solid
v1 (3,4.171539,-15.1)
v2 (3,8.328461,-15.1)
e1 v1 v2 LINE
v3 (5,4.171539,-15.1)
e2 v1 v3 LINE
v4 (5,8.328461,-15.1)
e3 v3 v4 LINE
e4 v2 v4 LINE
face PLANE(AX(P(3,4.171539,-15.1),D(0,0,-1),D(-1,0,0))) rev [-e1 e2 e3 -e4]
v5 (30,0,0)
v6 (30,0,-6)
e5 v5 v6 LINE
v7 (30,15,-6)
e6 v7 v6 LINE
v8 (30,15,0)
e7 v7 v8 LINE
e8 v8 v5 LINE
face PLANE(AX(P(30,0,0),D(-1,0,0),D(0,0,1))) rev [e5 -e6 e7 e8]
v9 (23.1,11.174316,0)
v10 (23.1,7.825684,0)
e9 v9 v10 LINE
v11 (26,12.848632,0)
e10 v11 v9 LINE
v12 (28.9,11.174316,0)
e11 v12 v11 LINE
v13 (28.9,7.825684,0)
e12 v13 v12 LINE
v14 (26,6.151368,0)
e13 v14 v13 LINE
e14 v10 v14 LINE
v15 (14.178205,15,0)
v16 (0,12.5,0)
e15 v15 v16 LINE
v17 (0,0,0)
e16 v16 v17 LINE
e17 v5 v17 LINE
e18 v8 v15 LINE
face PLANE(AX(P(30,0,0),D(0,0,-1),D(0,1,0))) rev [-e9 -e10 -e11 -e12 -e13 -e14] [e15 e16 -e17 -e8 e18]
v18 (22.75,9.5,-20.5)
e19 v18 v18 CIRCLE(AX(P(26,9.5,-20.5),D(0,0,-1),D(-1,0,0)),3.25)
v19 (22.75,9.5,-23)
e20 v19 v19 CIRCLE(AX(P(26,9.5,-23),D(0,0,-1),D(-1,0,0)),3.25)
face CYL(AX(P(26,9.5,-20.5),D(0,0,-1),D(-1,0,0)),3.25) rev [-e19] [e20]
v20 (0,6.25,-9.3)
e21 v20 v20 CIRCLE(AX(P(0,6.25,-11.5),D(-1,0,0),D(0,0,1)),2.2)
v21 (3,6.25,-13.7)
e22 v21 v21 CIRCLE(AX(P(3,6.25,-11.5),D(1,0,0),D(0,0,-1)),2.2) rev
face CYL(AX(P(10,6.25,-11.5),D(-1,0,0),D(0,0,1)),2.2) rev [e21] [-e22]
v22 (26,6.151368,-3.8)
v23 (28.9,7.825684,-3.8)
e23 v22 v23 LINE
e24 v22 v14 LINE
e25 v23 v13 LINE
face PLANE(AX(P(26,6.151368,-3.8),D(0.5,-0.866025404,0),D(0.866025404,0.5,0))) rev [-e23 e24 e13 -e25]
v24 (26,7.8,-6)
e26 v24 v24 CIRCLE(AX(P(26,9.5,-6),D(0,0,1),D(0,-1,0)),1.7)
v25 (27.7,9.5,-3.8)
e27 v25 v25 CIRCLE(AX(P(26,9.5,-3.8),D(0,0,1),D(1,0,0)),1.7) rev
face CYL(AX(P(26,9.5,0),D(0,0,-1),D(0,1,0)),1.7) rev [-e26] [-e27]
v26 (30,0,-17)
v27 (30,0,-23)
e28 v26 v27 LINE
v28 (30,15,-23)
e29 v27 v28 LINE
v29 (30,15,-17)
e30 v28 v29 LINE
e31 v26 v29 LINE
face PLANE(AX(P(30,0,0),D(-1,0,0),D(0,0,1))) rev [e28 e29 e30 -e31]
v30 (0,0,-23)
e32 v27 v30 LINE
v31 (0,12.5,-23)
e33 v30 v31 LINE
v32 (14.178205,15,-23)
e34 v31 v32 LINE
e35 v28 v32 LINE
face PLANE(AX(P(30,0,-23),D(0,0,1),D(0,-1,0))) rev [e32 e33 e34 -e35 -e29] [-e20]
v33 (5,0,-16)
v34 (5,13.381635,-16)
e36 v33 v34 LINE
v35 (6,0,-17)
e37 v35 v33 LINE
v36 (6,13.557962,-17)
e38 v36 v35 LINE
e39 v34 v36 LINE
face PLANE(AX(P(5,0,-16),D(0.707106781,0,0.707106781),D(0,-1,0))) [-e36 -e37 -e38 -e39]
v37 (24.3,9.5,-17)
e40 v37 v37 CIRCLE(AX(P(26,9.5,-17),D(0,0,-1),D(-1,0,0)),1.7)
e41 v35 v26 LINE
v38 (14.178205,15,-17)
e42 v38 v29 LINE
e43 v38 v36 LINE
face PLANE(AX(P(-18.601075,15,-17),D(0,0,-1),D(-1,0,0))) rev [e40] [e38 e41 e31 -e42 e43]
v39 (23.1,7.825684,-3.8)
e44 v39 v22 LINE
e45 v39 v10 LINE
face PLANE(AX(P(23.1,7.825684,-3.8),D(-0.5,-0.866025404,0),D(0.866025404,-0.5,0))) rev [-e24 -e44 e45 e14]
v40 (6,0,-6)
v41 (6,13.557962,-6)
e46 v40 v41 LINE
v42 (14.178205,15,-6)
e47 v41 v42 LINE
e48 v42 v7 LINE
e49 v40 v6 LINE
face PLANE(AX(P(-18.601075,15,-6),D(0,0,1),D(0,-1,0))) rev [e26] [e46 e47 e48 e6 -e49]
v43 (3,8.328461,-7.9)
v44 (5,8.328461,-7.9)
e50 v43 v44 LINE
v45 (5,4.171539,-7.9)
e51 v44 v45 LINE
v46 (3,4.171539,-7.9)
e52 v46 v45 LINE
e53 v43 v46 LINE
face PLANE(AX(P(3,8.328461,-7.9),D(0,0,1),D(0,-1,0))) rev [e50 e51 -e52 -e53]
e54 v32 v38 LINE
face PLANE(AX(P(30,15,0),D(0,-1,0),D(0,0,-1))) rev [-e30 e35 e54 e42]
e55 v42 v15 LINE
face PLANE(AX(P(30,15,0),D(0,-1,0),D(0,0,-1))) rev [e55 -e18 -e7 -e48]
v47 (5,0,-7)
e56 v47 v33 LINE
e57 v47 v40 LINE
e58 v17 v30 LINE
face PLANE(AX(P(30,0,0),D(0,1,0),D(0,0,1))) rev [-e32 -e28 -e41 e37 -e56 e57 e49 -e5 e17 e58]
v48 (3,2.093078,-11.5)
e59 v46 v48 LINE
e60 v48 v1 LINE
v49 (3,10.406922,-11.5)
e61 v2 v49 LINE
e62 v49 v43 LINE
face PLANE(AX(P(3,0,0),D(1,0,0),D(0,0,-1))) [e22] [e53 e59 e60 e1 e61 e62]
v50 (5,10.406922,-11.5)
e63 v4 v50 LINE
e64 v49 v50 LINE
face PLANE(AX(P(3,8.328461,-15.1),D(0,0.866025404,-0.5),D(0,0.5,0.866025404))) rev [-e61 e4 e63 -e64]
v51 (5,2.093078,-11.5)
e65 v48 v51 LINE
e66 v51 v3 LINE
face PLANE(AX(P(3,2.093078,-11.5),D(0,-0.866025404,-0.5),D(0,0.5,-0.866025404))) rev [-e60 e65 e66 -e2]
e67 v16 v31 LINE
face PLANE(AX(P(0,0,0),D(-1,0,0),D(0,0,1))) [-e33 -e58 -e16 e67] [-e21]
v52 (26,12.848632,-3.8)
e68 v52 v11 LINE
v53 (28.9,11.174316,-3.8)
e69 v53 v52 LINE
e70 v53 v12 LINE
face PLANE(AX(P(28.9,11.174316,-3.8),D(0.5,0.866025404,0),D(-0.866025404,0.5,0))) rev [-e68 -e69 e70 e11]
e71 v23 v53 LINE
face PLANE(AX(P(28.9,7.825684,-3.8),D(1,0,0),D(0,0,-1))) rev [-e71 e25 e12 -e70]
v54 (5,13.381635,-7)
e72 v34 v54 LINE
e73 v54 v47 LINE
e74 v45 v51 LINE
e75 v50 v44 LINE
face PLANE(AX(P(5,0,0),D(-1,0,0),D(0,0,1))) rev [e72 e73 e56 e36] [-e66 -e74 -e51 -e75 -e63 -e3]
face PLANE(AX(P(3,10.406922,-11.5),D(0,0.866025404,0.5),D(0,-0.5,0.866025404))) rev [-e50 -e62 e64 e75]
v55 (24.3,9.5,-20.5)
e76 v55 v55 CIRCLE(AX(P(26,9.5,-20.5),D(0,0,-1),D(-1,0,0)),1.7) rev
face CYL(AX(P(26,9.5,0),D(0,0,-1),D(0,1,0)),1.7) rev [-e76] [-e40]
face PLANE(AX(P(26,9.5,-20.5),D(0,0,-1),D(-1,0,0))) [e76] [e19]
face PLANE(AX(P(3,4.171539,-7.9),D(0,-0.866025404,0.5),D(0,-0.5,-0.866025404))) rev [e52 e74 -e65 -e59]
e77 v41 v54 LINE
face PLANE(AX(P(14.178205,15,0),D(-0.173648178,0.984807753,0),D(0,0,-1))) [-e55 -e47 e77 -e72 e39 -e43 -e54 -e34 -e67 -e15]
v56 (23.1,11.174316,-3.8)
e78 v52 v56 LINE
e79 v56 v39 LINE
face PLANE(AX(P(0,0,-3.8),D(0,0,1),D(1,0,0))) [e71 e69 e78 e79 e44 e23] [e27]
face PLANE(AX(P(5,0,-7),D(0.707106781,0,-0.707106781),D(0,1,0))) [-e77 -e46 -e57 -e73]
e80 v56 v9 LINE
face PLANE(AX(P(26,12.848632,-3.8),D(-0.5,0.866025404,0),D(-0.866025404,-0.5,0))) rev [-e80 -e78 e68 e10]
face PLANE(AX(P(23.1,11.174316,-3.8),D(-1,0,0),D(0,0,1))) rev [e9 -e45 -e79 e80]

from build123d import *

# Parameters (mm, degrees)
SKETCH1_W               = 23
SKETCH1_H               = 15
BOSS_EXTRUDE1_DEPTH     = 30
SKETCH2_W               = 11
SKETCH2_H               = 15
CUT_EXTRUDE1_DEPTH      = 25
CUT_EXTRUDE2_DEPTH      = 41.669398815
CUT_EXTRUDE2_DEPTH_BACK = 41.669398815
SKETCH3_R               = 1.7
CHAMFER1_SIZE           = 2.5
CHAMFER1_SIZE_2         = 14.178204549
SKETCH4_R               = 2.2
CUT_EXTRUDE3_DEPTH      = 10
CUT_EXTRUDE4_DEPTH      = 2
SKETCH6_R               = 3.25
CUT_EXTRUDE5_DEPTH      = 2.5
CUT_EXTRUDE6_DEPTH      = 3.8
CHAMFER3_SIZE           = 1


with BuildPart() as part:
    # Sketch1 → Boss-Extrude1 (new body)
    with BuildSketch(Plane(origin=(0, 0, 0), x_dir=(0, 0, -1), z_dir=(1, 0, 0))):
        with Locations((11.5, 7.5)):
            Rectangle(SKETCH1_W, SKETCH1_H)
    extrude(amount=BOSS_EXTRUDE1_DEPTH)

    # Sketch2 → Cut-Extrude1 (cut)
    with BuildSketch(Plane(origin=(30, 0, 0), x_dir=(0, 0, -1), z_dir=(1, 0, 0))):
        with Locations((11.5, 7.5)):
            Rectangle(SKETCH2_W, SKETCH2_H)
    extrude(amount=-CUT_EXTRUDE1_DEPTH, mode=Mode.SUBTRACT)

    # Sketch3 → Cut-Extrude2 (cut, two sides: drawn at the far end of the back side and taken through both)
    with BuildSketch(Plane(origin=(0, 0, -23), x_dir=(-1, 0, 0), z_dir=(0, 0, -1)).offset(-CUT_EXTRUDE2_DEPTH_BACK)):
        with Locations(Location((-26, 9.5, 0), (0, 0, 90))):
            Circle(SKETCH3_R)
    extrude(amount=CUT_EXTRUDE2_DEPTH + CUT_EXTRUDE2_DEPTH_BACK, mode=Mode.SUBTRACT)

    # Chamfer1
    # the kernel refuses this chamfer: 14.178204549, 2.5 mm, written as the material it takes off along each edge
    with BuildSketch(Plane(origin=(0, 15, -59.842614584), x_dir=(-0.21013876076743537, -0.9776715712462578, 0), z_dir=(0, 0, 1))) as chamfer1_piece_1:
        Polygon((CHAMFER1_SIZE * 0.977671571246, CHAMFER1_SIZE * 0.210138760767), (-CHAMFER1_SIZE_2 * 0.210138760768, CHAMFER1_SIZE_2 * 0.977671571249), (0, 0), align=None)
    extrude(amount=96.685229169, mode=Mode.SUBTRACT)

    # Sketch4 → Cut-Extrude3 (cut)
    with BuildSketch(Plane.ZY):
        with Locations((-11.5, 6.25)):
            Circle(SKETCH4_R)
    extrude(amount=-CUT_EXTRUDE3_DEPTH, mode=Mode.SUBTRACT)

    # Sketch5 → Cut-Extrude4 (cut)
    with BuildSketch(Plane(origin=(5, 0, 0), x_dir=(0, 0, -1), z_dir=(1, 0, 0))):
        Polygon((7.9, 8.328460969), (7.9, 4.171539031), (11.5, 2.093078062), (15.1, 4.171539031), (15.1, 8.328460969), (11.5, 10.406921938), align=None)
    extrude(amount=-CUT_EXTRUDE4_DEPTH, mode=Mode.SUBTRACT)

    # Sketch6 → Cut-Extrude5 (cut)
    with BuildSketch(Plane(origin=(0, 0, -23), x_dir=(-1, 0, 0), z_dir=(0, 0, -1))):
        with Locations((-26, 9.5)):
            Circle(SKETCH6_R)
    extrude(amount=-CUT_EXTRUDE5_DEPTH, mode=Mode.SUBTRACT)

    # Sketch7 → Cut-Extrude6 (cut)
    with BuildSketch(Plane.XY):
        Polygon((23.1, 11.174315781), (23.1, 7.825684219), (26, 6.151368439), (28.9, 7.825684219), (28.9, 11.174315781), (26, 12.848631561), align=None)
    extrude(amount=-CUT_EXTRUDE6_DEPTH, mode=Mode.SUBTRACT)

    # Chamfer3
    chamfer3_edges = [part.edges().sort_by_distance(p)[0] for p in [
        (5, 6.690817452, -17),
        (5, 6.690817452, -6),
    ]]
    chamfer(chamfer3_edges, length=CHAMFER3_SIZE)


solid = part.part
